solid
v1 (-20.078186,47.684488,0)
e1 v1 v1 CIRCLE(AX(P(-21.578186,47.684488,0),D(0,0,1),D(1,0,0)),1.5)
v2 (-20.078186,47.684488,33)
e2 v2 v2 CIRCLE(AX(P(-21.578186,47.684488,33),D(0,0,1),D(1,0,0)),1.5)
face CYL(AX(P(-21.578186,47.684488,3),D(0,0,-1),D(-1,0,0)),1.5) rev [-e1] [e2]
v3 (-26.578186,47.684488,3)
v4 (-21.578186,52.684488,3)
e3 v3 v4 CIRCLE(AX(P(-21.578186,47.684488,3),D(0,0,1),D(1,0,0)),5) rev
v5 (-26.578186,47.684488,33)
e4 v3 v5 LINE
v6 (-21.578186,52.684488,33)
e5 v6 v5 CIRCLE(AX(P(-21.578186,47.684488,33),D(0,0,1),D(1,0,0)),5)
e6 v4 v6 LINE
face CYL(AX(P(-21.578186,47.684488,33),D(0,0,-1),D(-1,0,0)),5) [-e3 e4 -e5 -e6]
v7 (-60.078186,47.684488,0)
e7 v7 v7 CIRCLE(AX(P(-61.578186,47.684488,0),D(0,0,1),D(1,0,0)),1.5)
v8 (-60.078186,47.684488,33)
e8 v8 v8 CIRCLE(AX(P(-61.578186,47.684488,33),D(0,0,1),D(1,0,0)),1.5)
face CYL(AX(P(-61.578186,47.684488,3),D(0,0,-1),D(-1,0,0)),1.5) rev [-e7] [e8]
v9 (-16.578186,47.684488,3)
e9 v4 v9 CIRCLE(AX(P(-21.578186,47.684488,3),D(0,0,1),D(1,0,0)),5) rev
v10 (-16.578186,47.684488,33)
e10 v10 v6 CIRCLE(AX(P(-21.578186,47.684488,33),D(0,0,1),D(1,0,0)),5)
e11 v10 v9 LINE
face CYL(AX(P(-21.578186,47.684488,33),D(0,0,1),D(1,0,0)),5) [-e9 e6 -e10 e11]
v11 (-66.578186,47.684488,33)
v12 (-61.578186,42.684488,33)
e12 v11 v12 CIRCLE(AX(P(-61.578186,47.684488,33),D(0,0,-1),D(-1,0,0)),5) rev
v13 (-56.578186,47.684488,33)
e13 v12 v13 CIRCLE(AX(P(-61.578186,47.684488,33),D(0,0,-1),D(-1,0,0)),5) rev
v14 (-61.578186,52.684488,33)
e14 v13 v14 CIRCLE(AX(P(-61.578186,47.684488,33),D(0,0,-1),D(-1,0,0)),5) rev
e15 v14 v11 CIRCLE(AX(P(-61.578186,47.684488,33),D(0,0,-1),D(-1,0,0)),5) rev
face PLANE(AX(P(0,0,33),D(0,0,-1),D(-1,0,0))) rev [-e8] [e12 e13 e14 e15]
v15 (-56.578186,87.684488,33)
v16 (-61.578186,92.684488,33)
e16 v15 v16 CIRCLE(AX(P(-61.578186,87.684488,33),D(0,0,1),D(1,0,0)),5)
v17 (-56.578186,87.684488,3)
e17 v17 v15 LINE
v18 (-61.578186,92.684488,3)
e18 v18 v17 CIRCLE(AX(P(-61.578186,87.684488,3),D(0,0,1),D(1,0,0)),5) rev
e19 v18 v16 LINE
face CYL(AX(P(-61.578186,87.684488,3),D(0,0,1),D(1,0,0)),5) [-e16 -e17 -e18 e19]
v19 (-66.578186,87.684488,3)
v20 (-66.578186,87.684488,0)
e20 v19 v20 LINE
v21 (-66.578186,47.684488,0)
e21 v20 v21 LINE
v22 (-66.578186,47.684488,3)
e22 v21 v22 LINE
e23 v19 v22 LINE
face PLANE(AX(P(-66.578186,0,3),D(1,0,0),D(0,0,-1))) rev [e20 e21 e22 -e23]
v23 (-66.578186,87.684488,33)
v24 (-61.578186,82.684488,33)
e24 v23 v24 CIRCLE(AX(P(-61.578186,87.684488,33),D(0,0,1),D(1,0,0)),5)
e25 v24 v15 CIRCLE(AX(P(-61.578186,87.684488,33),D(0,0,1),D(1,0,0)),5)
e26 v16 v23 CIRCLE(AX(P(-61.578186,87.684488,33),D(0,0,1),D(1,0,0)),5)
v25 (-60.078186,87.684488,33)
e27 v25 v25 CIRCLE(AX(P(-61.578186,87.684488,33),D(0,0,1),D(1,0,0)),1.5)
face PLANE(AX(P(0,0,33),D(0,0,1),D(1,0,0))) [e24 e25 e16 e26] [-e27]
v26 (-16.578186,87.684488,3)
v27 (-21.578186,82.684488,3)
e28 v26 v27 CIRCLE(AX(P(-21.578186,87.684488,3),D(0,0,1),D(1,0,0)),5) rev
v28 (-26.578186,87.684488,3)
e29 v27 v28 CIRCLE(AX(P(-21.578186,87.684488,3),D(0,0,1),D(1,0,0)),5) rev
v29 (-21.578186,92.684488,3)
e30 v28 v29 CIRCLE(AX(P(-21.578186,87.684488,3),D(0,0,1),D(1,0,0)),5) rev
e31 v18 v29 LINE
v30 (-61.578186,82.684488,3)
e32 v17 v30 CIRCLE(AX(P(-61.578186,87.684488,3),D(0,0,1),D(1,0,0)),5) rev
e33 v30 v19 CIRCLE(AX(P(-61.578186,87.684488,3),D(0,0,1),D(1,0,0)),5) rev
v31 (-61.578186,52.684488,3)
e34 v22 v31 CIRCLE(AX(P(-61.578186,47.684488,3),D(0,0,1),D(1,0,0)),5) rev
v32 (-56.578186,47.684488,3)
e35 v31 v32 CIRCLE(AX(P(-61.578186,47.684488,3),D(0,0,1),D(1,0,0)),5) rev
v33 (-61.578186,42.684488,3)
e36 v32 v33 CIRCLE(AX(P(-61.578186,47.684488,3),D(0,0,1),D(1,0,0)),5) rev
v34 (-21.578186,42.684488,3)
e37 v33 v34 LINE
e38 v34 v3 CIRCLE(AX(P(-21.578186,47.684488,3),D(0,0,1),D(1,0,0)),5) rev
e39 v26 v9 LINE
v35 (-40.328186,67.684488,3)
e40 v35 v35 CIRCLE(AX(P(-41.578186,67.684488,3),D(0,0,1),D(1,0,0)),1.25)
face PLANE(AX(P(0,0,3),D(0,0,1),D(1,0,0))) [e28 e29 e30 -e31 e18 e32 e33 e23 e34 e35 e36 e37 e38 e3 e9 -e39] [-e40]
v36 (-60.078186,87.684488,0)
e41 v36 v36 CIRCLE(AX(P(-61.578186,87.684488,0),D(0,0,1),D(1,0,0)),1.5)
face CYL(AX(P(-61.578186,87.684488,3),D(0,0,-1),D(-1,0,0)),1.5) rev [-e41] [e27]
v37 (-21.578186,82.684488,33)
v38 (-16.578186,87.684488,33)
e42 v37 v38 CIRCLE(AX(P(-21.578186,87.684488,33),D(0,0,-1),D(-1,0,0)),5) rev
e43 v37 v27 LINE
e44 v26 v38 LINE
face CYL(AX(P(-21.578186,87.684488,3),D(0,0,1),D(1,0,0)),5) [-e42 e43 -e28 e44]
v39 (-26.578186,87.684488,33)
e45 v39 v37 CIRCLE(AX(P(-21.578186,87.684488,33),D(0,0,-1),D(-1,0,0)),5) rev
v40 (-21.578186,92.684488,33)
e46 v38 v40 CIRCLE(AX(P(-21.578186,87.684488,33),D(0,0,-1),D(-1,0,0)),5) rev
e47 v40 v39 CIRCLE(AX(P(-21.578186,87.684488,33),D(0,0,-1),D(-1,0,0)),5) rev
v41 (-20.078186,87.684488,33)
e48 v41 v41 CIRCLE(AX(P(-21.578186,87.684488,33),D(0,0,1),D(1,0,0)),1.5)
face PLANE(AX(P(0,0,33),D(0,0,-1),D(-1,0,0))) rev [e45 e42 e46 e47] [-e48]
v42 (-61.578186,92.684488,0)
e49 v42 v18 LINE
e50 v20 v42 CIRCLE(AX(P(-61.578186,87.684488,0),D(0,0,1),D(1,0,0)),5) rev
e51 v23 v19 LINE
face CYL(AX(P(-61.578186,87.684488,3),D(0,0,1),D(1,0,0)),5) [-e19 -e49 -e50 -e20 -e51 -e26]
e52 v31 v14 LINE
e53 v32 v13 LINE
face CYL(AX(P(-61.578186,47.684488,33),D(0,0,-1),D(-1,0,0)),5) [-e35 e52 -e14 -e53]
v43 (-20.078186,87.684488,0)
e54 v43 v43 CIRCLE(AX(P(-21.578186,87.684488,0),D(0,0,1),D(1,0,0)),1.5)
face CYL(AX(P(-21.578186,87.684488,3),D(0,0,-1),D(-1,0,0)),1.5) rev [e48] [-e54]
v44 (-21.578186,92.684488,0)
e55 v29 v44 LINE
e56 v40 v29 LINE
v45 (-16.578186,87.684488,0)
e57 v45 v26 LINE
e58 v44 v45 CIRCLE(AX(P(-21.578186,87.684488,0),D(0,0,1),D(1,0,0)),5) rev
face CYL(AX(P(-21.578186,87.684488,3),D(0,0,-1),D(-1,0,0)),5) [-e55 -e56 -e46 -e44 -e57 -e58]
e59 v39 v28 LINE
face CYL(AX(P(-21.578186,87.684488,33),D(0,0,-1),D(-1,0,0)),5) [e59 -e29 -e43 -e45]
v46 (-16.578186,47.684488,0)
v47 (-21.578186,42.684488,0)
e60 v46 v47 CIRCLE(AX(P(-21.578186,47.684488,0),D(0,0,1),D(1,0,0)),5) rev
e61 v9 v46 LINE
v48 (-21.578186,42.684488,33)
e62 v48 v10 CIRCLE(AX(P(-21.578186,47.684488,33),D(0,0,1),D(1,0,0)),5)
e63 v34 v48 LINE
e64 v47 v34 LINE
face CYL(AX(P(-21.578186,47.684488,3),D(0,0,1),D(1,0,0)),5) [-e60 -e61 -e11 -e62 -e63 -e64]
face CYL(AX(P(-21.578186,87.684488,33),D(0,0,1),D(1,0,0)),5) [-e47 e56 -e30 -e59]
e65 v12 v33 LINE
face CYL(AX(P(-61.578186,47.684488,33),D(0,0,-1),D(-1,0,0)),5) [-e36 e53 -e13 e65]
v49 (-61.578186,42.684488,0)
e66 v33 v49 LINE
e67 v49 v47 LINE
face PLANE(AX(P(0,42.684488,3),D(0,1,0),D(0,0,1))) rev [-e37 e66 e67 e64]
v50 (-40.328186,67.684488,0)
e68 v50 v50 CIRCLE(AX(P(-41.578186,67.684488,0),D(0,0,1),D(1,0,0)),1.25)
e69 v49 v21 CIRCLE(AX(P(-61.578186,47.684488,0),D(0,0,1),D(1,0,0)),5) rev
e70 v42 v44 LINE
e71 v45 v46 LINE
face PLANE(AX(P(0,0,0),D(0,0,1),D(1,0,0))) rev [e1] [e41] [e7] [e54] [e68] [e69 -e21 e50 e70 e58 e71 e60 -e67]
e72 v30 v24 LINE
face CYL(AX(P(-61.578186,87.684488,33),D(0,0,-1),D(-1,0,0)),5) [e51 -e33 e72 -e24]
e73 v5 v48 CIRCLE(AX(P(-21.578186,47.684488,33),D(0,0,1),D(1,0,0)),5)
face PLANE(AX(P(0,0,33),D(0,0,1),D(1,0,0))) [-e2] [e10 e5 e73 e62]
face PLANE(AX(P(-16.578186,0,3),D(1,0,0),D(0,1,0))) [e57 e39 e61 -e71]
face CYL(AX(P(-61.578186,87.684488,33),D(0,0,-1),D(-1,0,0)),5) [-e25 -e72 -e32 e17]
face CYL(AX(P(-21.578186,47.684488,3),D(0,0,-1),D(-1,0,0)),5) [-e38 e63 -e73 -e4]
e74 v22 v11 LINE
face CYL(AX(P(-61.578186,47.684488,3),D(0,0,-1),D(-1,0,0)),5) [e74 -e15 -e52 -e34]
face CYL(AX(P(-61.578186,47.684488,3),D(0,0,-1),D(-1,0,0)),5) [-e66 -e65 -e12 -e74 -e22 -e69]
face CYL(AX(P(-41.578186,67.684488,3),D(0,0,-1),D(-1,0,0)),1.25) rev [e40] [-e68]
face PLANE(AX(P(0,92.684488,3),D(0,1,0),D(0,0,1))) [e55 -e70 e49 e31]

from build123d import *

# Parameters (mm, degrees)
SKETCH2_W           = 50
SKETCH2_H           = 50
SKETCH2_R           = 1.5
SKETCH2_R_2         = 1.25
BOSS_EXTRUDE1_DEPTH = 3
SKETCH3_W           = 10
SKETCH3_H           = 10
SKETCH3_R           = 1.5
BOSS_EXTRUDE2_DEPTH = 30
FILLET2_R           = 5
FILLET3_R           = 5


with BuildPart() as part:
    # Sketch2 → Boss-Extrude1 (new body)
    with BuildSketch(Plane.XY):
        with Locations((-41.57818593, 67.684487612)):
            Rectangle(SKETCH2_W, SKETCH2_H)
        with Locations((-61.57818593, 87.684487612)):
            Circle(SKETCH2_R, mode=Mode.SUBTRACT)
        with Locations((-21.57818593, 87.684487612)):
            Circle(SKETCH2_R, mode=Mode.SUBTRACT)
        with Locations((-61.57818593, 47.684487612)):
            Circle(SKETCH2_R, mode=Mode.SUBTRACT)
        with Locations((-21.57818593, 47.684487612)):
            Circle(SKETCH2_R, mode=Mode.SUBTRACT)
        with Locations((-41.57818593, 67.684487612)):
            Circle(SKETCH2_R_2, mode=Mode.SUBTRACT)
    extrude(amount=BOSS_EXTRUDE1_DEPTH)

    # Sketch3 → Boss-Extrude2 (add)
    # profile 1 of 4: a face of its own
    with BuildSketch(Plane.XY.offset(3)):
        with Locations((-61.57818593, 87.684487612)):
            Rectangle(SKETCH3_W, SKETCH3_H)
        with Locations((-61.57818593, 87.684487612)):
            Circle(SKETCH3_R, mode=Mode.SUBTRACT)
    # profile 2 of 4: a face of its own
    with BuildSketch(Plane.XY.offset(3)):
        with Locations((-21.57818593, 87.684487612)):
            Rectangle(SKETCH3_W, SKETCH3_H)
        with Locations((-21.57818593, 87.684487612)):
            Circle(SKETCH3_R, mode=Mode.SUBTRACT)
    # profile 3 of 4: a face of its own
    with BuildSketch(Plane.XY.offset(3)):
        with Locations((-21.57818593, 47.684487612)):
            Rectangle(SKETCH3_W, SKETCH3_H)
        with Locations((-21.57818593, 47.684487612)):
            Circle(SKETCH3_R, mode=Mode.SUBTRACT)
    # profile 4 of 4: a face of its own
    with BuildSketch(Plane.XY.offset(3)):
        with Locations((-61.57818593, 47.684487612)):
            Rectangle(SKETCH3_W, SKETCH3_H)
        with Locations((-61.57818593, 47.684487612)):
            Circle(SKETCH3_R, mode=Mode.SUBTRACT)
    extrude(amount=BOSS_EXTRUDE2_DEPTH)

    # Fillet2
    fillet2_edges = [part.edges().sort_by_distance(p)[0] for p in [
        (-16.57818593, 42.684487612, 16.5),
        (-66.57818593, 42.684487612, 16.5),
        (-66.57818593, 92.684487612, 16.5),
        (-16.57818593, 92.684487612, 16.5),
    ]]
    fillet(fillet2_edges, radius=FILLET2_R)

    # Fillet3
    fillet3_edges = [part.edges().sort_by_distance(p)[0] for p in [
        (-16.57818593, 82.684487612, 18),
        (-26.57818593, 82.684487612, 18),
        (-26.57818593, 92.684487612, 18),
        (-16.57818593, 52.684487612, 18),
        (-26.57818593, 52.684487612, 18),
        (-26.57818593, 42.684487612, 18),
        (-56.57818593, 42.684487612, 18),
        (-56.57818593, 52.684487612, 18),
        (-66.57818593, 52.684487612, 18),
        (-66.57818593, 82.684487612, 18),
        (-56.57818593, 82.684487612, 18),
        (-56.57818593, 92.684487612, 18),
    ]]
    fillet(fillet3_edges, radius=FILLET3_R - 0.0001)  # a hair under: the kernel refuses the full size


solid = part.part
